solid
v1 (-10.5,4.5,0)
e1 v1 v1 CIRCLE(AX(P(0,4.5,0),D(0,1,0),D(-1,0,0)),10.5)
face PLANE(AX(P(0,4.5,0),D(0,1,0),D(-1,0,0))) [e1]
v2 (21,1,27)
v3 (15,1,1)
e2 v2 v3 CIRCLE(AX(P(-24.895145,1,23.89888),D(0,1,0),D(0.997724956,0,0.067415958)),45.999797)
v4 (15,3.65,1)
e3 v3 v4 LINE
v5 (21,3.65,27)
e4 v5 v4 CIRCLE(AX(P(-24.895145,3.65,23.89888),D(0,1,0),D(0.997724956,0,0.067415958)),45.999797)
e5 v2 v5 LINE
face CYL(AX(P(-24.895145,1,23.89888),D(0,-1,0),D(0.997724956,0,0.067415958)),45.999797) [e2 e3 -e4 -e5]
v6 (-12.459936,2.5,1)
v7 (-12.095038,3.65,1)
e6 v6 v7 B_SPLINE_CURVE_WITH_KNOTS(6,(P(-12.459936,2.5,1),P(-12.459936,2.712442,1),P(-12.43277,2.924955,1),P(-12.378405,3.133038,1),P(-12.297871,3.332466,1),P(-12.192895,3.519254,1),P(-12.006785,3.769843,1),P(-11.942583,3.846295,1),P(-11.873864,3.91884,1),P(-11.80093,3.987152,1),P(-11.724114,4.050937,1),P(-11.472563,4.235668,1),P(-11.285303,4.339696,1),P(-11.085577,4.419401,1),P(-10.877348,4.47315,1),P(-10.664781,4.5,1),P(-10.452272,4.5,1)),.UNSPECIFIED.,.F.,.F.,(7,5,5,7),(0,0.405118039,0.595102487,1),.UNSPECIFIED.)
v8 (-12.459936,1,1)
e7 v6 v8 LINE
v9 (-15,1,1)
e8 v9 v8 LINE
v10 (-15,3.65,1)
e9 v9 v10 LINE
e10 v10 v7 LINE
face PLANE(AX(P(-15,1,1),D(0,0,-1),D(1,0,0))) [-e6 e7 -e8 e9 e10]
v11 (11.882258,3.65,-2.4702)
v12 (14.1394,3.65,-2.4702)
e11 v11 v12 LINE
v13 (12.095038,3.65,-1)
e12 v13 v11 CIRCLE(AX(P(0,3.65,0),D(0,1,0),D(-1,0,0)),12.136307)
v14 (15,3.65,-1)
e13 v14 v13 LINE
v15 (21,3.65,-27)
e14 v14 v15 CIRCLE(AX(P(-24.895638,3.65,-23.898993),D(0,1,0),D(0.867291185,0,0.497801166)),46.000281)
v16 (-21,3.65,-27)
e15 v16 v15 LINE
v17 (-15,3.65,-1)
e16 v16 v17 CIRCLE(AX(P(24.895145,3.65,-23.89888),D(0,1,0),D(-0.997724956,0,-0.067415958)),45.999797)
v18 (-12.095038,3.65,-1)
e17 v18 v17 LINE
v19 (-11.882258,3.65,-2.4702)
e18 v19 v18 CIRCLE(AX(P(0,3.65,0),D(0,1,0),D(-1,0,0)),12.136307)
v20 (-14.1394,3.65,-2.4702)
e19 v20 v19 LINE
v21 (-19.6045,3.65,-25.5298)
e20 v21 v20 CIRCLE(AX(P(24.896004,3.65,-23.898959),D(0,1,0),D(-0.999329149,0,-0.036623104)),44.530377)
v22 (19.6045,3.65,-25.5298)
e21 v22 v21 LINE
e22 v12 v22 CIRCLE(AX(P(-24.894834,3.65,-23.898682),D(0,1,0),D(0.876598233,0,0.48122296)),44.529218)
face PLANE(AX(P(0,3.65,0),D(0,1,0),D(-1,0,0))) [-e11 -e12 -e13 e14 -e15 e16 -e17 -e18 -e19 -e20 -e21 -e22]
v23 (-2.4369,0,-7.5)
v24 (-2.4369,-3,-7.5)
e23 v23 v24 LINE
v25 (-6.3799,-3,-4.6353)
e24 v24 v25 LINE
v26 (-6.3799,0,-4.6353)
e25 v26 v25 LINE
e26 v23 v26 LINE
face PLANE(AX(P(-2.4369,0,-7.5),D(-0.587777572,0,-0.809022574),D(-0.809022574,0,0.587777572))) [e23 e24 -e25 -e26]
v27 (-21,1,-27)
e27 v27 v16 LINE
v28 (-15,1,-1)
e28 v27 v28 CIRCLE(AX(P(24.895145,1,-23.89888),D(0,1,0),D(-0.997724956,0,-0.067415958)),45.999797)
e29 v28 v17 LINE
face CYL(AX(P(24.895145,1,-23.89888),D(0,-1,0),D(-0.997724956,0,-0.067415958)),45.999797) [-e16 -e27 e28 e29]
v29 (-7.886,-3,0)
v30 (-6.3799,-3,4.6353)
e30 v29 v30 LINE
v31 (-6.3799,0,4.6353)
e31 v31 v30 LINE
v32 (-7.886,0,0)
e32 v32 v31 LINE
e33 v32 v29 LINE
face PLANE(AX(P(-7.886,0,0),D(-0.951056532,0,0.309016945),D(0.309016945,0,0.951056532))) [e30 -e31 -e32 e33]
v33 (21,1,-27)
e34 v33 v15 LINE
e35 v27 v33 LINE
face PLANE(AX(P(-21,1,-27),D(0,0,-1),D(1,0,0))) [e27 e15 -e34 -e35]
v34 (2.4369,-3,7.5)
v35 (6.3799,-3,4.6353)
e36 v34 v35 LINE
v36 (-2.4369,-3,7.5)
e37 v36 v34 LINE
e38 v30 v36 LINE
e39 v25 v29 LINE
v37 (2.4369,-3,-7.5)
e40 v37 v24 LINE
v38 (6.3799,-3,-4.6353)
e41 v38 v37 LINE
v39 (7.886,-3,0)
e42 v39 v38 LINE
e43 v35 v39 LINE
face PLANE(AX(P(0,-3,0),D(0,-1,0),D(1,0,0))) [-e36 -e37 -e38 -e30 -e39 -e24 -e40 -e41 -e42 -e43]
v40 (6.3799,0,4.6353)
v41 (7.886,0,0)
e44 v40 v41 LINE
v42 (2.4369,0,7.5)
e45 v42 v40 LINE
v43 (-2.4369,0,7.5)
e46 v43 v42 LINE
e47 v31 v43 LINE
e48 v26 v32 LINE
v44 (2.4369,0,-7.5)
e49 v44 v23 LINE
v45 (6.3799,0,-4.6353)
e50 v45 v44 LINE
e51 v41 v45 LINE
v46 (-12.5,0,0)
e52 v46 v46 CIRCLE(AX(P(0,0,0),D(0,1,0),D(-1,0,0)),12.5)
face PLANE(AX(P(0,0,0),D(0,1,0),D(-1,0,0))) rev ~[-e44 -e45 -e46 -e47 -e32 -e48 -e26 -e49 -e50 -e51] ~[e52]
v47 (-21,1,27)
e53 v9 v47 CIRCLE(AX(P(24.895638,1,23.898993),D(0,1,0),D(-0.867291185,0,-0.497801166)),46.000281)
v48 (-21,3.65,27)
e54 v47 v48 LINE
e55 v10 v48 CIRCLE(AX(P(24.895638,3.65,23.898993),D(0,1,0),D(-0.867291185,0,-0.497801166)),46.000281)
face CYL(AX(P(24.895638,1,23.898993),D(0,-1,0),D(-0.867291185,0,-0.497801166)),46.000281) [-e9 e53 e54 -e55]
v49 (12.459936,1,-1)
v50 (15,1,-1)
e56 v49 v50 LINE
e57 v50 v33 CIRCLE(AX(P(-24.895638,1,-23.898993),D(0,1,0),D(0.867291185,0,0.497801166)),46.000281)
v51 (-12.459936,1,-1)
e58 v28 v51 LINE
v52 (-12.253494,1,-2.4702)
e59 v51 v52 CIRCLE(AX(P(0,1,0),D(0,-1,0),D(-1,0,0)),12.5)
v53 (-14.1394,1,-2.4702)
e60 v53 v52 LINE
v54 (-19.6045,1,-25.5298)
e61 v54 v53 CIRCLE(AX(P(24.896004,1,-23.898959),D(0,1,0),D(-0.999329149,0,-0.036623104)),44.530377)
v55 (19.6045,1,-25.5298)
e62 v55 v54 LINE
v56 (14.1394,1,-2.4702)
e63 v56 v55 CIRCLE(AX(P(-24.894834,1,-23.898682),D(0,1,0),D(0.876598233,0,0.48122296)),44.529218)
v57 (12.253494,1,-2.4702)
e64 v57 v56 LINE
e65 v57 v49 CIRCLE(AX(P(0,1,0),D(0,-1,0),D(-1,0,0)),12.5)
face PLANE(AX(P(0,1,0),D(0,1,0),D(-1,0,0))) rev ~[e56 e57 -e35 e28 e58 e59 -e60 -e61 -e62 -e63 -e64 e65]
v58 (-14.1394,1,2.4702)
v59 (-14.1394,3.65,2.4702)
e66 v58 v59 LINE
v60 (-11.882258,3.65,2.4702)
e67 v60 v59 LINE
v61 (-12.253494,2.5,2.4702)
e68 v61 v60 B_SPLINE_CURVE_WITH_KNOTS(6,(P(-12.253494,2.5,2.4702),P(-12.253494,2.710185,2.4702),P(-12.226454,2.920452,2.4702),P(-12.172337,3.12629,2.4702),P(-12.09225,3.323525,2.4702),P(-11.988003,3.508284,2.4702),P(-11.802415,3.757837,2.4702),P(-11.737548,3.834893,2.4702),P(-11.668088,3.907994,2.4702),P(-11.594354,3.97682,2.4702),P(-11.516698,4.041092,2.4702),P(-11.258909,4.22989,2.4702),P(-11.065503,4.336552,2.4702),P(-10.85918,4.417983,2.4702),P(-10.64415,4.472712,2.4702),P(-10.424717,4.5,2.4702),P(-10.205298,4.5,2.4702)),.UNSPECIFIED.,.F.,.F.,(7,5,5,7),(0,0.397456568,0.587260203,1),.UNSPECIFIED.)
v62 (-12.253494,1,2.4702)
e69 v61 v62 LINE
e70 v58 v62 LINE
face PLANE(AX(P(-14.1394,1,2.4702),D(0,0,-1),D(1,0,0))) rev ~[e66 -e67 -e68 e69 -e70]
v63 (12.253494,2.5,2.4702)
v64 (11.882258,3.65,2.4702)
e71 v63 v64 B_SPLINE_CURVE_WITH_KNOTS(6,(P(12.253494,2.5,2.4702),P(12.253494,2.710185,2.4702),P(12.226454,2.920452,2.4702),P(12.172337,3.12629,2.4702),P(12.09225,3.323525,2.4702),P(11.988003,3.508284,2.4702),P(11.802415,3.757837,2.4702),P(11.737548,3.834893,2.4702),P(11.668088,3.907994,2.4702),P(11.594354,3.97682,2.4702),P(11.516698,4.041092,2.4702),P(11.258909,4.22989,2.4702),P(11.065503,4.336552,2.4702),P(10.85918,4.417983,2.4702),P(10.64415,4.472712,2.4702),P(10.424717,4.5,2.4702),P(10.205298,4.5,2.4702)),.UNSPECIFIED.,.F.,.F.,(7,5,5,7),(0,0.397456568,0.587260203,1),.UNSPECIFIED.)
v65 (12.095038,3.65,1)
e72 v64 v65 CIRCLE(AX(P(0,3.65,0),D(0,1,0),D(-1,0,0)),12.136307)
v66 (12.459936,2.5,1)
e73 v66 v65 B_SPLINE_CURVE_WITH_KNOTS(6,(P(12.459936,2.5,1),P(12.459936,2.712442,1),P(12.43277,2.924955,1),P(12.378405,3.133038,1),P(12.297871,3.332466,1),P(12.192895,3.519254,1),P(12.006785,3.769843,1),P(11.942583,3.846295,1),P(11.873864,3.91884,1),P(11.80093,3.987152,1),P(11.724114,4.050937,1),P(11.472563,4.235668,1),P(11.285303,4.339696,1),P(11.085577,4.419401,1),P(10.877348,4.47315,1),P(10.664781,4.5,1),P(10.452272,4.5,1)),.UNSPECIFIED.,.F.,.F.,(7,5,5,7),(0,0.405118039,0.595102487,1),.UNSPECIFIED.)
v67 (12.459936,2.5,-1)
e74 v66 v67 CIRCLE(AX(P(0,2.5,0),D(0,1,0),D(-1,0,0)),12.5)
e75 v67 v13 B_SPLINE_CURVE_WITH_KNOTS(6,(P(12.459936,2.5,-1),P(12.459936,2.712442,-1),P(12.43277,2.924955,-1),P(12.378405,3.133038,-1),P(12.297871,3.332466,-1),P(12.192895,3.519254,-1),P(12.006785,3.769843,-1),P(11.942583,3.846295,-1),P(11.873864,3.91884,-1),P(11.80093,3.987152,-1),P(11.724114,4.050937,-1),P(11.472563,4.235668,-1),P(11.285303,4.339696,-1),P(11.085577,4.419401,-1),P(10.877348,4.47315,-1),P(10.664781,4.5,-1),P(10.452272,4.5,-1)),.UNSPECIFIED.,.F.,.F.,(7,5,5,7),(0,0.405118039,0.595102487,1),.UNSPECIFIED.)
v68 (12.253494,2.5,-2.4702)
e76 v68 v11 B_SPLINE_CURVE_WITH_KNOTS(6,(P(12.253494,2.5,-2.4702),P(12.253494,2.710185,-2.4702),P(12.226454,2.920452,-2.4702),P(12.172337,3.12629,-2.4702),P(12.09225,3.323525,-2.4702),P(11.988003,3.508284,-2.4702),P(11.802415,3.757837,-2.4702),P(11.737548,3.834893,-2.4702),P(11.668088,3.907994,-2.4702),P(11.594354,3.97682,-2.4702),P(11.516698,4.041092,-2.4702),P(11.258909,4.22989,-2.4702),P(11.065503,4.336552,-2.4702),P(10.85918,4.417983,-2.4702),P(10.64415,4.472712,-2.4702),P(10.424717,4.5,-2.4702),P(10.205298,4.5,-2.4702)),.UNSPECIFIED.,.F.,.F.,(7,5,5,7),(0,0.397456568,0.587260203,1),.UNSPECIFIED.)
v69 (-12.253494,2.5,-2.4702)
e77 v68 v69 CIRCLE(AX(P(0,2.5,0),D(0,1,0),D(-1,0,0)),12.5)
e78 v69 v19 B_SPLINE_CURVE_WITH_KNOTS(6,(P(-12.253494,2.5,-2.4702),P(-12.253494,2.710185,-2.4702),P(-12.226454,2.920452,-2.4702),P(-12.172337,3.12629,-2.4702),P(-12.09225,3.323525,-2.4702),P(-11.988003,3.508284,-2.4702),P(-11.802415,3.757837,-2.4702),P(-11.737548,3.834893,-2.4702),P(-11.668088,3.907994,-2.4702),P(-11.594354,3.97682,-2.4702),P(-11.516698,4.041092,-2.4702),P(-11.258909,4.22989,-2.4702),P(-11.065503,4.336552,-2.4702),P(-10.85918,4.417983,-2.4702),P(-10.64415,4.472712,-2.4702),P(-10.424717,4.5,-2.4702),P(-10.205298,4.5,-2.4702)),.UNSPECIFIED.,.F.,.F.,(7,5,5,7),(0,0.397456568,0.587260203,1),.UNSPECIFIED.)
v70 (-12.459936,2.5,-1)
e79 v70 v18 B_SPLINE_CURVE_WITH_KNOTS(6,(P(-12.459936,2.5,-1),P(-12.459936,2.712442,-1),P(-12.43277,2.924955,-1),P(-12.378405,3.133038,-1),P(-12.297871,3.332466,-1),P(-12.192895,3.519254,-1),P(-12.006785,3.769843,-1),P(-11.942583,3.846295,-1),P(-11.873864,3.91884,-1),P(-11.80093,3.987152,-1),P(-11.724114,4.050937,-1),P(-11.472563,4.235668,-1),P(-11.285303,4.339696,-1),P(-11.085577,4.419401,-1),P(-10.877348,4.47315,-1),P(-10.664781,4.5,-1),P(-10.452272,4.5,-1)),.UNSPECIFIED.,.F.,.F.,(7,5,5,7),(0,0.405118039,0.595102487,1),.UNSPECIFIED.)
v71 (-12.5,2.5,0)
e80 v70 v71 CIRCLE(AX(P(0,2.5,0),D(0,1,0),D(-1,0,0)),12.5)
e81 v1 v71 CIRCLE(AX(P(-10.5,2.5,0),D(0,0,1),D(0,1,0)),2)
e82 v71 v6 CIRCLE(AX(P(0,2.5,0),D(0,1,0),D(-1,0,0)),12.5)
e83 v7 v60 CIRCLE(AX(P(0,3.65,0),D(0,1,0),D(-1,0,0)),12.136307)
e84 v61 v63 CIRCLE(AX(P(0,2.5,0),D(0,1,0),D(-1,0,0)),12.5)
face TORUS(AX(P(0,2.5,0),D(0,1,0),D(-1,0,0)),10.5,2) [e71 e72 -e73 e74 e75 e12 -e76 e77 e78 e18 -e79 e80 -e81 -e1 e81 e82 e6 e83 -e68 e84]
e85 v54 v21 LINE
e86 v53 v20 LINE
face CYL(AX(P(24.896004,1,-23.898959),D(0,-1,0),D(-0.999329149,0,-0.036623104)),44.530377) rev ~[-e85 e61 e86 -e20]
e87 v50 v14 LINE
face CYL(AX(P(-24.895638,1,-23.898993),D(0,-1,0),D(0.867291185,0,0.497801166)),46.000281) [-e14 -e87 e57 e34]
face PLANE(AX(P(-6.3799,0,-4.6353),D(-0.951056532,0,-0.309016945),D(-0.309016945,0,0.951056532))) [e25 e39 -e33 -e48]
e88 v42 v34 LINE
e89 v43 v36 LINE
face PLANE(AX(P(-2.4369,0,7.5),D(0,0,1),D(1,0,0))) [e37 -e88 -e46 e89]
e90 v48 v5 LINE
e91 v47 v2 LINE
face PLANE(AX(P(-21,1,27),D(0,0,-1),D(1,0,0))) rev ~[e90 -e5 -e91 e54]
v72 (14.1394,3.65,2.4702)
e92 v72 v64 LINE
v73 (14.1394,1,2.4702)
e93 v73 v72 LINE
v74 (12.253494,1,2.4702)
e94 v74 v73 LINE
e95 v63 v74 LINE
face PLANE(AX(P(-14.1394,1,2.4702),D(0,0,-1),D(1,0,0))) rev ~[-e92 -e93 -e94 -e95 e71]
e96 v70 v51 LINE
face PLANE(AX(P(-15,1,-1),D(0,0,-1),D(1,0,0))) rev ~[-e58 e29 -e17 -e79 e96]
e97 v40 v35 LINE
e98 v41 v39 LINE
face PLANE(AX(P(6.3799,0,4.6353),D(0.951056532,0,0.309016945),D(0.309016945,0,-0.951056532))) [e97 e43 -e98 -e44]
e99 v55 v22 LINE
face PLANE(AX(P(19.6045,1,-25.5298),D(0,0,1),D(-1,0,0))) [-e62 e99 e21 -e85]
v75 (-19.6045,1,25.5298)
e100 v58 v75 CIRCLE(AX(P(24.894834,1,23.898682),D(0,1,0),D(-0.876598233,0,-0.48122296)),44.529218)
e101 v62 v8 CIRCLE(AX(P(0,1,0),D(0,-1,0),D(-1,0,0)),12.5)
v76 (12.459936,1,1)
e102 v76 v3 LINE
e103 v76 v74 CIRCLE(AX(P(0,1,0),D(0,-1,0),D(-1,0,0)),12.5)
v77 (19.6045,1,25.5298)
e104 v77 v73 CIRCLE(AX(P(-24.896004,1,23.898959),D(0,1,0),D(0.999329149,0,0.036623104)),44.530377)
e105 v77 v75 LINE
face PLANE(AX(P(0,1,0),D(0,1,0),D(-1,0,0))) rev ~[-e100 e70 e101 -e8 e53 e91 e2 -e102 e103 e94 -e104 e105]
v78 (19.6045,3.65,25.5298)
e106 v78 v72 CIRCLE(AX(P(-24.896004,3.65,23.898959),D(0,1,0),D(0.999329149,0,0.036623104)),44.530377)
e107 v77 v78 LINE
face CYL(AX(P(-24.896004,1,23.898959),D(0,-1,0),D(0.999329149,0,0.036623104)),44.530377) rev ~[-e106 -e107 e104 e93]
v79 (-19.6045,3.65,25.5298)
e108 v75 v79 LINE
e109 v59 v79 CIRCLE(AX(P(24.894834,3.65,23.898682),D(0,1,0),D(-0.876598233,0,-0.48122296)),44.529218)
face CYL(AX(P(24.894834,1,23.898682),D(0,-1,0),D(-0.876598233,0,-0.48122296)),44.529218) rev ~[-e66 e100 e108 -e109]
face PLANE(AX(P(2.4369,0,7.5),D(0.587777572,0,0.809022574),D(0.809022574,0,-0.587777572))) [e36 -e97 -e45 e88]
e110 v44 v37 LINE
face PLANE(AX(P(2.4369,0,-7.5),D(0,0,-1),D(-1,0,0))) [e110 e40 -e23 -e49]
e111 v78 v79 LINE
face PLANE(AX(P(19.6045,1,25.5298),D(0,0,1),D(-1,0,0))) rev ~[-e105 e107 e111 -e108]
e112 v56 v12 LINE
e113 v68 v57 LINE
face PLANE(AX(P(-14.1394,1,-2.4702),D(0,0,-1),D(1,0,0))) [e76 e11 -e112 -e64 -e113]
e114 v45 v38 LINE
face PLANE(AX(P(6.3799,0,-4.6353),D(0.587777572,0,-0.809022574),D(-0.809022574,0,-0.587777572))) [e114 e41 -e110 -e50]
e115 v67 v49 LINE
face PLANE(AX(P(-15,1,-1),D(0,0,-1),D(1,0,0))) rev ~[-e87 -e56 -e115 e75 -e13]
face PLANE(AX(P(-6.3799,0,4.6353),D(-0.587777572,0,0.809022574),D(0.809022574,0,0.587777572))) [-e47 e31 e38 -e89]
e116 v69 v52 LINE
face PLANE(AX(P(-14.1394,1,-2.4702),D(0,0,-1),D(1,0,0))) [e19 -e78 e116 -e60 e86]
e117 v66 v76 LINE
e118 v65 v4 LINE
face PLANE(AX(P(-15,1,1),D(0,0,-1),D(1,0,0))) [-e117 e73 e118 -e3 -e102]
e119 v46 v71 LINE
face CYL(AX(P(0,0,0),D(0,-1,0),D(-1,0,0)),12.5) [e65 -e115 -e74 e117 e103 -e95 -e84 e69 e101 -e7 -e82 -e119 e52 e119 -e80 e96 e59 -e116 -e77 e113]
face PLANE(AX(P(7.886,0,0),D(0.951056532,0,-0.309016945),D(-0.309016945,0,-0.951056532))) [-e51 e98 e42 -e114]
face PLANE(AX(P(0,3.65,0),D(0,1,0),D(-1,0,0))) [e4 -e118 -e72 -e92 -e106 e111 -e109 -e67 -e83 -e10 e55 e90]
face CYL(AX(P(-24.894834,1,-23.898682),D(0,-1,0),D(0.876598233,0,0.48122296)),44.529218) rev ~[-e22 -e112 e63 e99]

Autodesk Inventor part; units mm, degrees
ref_plane "YZ Plane" through (0, 0, 0) normal (1, 0, 0) x (0, 1, 0)
ref_plane "XY Plane" through (0, 0, 0) normal (0, 0, 1) x (1, 0, 0)
sketch "Sketch1" plane through (0, 0, 0) normal (0, 1, 0) x (-1, 0, 0)
  circle A0 centre (0, 0) radius 12.5
  dimension "d0" = 25
extrude "Extrusion1" add sketch "Sketch1" along normal blind 4.5
ref_plane "Work Plane1" through (0, 1, 0) normal (0, 1, 0) x (-1, 0, 0)
sketch "Sketch2" plane through (0, 1, 0) normal (0, 1, 0) x (-1, 0, 0)
  line L0 (15, -1) -> (-15, -1)
  arc A0 (21, -27) -> (15, -1) centre (-24.8954, -23.8989) ccw
  line L1 (21, -27) -> (-21, -27)
  arc A1 (-15, -1) -> (-21, -27) centre (24.8954, -23.8989) ccw
  line L2 (-19.6045, -25.5298) -> (19.6045, -25.5298)
  arc A2 (19.6045, -25.5298) -> (14.1394, -2.4702) centre (-24.8954, -23.8989) ccw
  line L3 (14.1394, -2.4702) -> (-14.1394, -2.4702)
  arc A3 (-14.1394, -2.4702) -> (-19.6045, -25.5298) centre (24.8954, -23.8989) ccw
  line L4 (31.9342, 0) -> (-23.3502, 0) construction
  line L5 (15, 1) -> (-15, 1)
  arc A4 (15, 1) -> (21, 27) centre (-24.8954, 23.8989) ccw
  line L6 (21, 27) -> (-21, 27)
  arc A5 (-21, 27) -> (-15, 1) centre (24.8954, 23.8989) ccw
  line L7 (-19.6045, 25.5298) -> (19.6045, 25.5298)
  arc A6 (14.1394, 2.4702) -> (19.6045, 25.5298) centre (-24.8954, 23.8989) ccw
  line L8 (14.1394, 2.4702) -> (-14.1394, 2.4702)
  arc A7 (-19.6045, 25.5298) -> (-14.1394, 2.4702) centre (24.8954, 23.8989) ccw
  point P0 (0, 0)
  point P1 (0, -1)
  point P2 (0, -27)
  point P3 (0, 1)
  point P4 (0, 27)
  dimension "d4" = 1
  dimension "d5" = 30
  dimension "d6" = 26
  dimension "d7" = 42
  dimension "d8" = 46
  dimension "d9" = 46
extrude "Extrusion2" add sketch "Sketch2" along normal blind 2.65
fillet "Fillet1" radius 2 1 edges at (12.5, 4.5, 0)
sketch "Sketch3" plane through (0, 0, 0) normal (0, -1, 0) x (1, 0, 0)
  line L0 (-7.886, 0) -> (-6.3799, 4.6353)
  line L1 (-6.3799, 4.6353) -> (-2.4369, 7.5)
  line L2 (-2.4369, 7.5) -> (2.4369, 7.5)
  line L3 (2.4369, 7.5) -> (6.3799, 4.6353)
  line L4 (6.3799, 4.6353) -> (7.886, 0)
  line L5 (7.886, 0) -> (6.3799, -4.6353)
  line L6 (6.3799, -4.6353) -> (2.4369, -7.5)
  line L7 (2.4369, -7.5) -> (-2.4369, -7.5)
  line L8 (-2.4369, -7.5) -> (-6.3799, -4.6353)
  line L9 (-6.3799, -4.6353) -> (-7.886, 0)
  point P0 (0, 0)
  point P1 (0, 0)
  point P2 (0, -7.5)
  dimension "d13" = 15
extrude "Extrusion3" add sketch "Sketch3" along normal blind 3
properties part number "brace_tabs"
